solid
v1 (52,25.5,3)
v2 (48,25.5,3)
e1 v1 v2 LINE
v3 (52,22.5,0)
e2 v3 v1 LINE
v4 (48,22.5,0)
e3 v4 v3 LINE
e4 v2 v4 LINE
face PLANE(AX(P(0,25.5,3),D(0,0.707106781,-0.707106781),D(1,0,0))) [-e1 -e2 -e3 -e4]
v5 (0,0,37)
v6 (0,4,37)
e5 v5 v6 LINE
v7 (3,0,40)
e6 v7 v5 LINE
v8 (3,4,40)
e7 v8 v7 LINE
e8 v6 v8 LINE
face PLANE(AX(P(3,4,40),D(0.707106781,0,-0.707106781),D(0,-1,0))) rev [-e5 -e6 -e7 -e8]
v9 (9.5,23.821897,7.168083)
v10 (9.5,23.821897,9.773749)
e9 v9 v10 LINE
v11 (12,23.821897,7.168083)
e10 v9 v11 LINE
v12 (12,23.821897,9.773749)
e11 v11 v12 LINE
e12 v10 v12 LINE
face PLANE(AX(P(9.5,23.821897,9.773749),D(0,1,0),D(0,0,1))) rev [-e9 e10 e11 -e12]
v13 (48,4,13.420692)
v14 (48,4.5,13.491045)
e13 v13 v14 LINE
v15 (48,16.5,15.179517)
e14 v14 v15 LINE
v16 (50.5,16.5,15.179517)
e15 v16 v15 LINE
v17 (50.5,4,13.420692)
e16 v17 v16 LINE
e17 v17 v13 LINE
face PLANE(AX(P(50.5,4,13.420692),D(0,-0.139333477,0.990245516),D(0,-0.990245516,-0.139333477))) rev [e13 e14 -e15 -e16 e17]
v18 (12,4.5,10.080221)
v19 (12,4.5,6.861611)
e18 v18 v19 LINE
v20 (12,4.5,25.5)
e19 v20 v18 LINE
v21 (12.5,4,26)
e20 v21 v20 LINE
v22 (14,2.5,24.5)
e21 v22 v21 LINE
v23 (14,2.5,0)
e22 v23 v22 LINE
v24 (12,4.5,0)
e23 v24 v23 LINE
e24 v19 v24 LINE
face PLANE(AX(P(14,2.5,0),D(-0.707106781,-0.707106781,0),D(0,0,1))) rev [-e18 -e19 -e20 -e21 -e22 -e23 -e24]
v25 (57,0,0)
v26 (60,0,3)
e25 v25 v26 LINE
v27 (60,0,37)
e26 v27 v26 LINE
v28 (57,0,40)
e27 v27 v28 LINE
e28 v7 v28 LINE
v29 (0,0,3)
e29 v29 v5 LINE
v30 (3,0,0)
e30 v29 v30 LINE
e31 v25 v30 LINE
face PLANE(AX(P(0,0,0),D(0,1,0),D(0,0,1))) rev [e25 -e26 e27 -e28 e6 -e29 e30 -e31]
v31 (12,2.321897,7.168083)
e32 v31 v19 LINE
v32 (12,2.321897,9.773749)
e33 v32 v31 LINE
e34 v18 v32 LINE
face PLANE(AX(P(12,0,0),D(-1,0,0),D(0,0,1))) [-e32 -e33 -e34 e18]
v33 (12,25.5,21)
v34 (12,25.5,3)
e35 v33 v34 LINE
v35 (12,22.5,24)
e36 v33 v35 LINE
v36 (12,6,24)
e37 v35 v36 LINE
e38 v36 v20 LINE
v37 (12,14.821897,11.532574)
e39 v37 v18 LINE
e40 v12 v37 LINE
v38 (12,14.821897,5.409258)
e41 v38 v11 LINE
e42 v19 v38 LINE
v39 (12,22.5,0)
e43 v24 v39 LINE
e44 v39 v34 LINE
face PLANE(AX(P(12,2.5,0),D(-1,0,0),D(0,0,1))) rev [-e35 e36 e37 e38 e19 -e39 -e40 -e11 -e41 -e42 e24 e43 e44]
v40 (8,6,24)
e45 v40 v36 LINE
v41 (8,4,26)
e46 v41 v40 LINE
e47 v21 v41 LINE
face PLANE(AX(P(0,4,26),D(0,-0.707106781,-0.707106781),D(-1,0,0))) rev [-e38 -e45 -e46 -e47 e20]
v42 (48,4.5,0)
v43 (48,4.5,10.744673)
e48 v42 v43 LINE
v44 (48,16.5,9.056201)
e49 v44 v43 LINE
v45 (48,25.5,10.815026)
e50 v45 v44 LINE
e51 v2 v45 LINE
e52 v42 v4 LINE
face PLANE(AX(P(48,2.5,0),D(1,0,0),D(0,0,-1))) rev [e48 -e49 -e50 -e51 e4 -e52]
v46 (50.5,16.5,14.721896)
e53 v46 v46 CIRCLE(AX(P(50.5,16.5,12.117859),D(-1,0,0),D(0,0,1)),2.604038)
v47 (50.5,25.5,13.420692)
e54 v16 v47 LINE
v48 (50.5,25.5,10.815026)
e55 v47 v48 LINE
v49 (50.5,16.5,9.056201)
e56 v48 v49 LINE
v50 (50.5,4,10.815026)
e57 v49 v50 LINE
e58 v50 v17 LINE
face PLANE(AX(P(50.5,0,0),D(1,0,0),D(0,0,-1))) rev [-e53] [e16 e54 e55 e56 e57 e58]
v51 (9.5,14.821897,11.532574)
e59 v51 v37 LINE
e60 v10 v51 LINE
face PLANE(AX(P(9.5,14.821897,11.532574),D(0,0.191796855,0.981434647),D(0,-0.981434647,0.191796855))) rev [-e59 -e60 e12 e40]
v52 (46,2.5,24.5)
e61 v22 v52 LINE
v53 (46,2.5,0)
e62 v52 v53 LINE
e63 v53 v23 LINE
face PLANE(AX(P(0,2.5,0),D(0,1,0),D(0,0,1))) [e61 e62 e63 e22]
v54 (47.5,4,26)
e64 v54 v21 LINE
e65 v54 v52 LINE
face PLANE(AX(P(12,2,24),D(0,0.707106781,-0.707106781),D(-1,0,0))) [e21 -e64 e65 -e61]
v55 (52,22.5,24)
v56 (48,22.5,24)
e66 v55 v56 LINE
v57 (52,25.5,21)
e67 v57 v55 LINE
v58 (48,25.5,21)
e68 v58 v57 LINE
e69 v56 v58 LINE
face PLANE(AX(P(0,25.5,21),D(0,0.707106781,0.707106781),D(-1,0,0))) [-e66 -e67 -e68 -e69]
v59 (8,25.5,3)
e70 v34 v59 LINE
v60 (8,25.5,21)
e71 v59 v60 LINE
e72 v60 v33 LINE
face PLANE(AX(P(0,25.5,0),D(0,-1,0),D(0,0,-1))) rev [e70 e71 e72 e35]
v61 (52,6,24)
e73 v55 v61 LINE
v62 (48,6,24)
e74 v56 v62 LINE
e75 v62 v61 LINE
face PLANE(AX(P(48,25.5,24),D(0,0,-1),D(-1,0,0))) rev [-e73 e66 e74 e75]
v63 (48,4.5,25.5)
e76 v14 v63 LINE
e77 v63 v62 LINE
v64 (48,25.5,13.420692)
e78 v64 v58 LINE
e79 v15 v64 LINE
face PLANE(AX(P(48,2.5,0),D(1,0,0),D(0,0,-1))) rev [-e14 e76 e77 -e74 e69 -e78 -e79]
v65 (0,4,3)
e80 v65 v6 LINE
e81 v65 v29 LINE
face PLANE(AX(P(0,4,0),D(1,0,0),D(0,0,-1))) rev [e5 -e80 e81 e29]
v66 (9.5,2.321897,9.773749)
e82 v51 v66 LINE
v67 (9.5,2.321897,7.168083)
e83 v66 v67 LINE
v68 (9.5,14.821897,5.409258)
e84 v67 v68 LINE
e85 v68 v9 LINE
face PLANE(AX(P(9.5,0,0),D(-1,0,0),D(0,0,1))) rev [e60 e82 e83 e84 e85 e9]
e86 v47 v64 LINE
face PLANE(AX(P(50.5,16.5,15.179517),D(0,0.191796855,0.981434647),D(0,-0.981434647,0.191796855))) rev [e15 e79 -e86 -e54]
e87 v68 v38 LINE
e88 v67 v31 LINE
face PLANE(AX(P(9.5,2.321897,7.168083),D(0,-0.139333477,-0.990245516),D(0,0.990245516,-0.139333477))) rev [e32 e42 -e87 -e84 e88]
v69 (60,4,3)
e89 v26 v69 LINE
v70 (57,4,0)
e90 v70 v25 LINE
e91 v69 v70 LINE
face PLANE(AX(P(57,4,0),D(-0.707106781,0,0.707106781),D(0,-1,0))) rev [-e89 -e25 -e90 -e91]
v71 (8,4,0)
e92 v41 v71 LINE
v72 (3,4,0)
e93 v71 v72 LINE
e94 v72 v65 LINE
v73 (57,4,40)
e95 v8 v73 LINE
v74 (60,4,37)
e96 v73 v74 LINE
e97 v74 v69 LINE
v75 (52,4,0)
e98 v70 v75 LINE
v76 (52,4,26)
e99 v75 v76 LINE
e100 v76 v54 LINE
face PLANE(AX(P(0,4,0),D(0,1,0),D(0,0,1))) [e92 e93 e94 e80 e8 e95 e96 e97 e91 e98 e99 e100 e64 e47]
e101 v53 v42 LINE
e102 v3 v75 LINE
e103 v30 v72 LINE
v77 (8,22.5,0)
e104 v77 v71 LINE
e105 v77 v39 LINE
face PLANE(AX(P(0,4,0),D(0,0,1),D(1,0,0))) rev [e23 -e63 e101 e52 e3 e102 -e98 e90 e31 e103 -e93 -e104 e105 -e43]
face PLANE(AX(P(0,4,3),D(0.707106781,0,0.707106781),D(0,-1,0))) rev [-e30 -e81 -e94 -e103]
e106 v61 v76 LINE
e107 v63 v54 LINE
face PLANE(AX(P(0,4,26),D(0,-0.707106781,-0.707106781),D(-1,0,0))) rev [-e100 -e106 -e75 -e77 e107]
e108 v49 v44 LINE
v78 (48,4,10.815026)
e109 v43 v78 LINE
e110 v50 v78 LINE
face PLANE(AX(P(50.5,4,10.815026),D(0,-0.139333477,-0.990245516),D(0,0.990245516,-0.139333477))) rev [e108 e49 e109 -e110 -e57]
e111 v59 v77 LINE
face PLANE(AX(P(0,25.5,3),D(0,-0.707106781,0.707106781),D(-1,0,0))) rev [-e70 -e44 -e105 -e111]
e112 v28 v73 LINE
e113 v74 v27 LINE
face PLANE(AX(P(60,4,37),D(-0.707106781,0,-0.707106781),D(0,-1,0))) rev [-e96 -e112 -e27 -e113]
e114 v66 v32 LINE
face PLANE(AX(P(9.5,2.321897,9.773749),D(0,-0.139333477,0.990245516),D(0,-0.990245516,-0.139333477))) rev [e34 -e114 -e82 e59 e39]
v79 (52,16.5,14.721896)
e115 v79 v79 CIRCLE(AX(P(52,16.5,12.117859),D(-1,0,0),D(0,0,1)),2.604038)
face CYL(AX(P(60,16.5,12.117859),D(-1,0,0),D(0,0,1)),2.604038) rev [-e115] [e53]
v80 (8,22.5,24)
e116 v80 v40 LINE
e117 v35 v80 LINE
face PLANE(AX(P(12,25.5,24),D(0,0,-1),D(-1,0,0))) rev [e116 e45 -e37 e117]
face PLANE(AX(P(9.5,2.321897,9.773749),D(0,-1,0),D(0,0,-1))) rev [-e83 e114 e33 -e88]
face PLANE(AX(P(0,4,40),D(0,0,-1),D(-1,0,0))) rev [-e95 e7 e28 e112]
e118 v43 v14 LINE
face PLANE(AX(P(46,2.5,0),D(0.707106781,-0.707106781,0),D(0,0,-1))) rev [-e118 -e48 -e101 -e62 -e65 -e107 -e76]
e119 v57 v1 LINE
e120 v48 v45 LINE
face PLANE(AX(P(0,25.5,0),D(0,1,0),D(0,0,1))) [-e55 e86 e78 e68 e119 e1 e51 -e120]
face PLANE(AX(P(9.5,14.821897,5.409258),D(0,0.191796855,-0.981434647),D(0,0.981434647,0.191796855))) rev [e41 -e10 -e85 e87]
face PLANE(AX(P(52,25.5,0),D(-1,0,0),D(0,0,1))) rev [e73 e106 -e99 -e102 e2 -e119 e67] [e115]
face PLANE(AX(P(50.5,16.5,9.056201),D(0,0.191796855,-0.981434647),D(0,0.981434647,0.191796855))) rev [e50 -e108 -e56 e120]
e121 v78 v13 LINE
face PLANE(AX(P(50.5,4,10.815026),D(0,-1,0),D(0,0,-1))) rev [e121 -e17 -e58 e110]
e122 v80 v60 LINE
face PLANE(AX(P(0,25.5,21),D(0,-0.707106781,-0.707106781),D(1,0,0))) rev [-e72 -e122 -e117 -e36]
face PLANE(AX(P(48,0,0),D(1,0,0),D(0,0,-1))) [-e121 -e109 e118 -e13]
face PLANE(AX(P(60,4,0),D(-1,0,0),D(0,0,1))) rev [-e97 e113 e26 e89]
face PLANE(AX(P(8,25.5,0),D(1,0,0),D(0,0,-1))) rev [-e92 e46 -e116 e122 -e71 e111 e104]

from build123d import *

# Parameters (mm, degrees)
SKETCH1_W           = 60
SKETCH1_H           = 40
BOSS_EXTRUDE1_DEPTH = 4
CHAMFER1_SIZE       = 3
SKETCH2_W           = 36
SKETCH2_H           = 24
CUT_EXTRUDE1_DEPTH  = 1.5
SKETCH3_W           = 4
SKETCH3_H           = 24
BOSS_EXTRUDE2_DEPTH = 23
CHAMFER2_SIZE       = 3
CHAMFER3_SIZE       = 2
CHAMFER4_SIZE       = 2
CHAMFER5_SIZE       = 2
CUT_EXTRUDE2_DEPTH  = 2.5
SKETCH7_R           = 2.604037506
CUT_EXTRUDE3_DEPTH  = 70.285640648
CUT_EXTRUDE4_DEPTH  = 2.5


with BuildPart() as part:
    # Sketch1 → Boss-Extrude1 (new body)
    with BuildSketch(Plane(origin=(0, 0, 0), x_dir=(1, 0, 0), z_dir=(0, 1, 0))):
        with Locations((30, -20)):
            Rectangle(SKETCH1_W, SKETCH1_H)
    extrude(amount=BOSS_EXTRUDE1_DEPTH)

    # Chamfer1
    chamfer1_edges = [part.edges().sort_by_distance(p)[0] for p in [
        (0, 2, 0),
        (60, 2, 0),
        (60, 2, 40),
        (0, 2, 40),
    ]]
    chamfer(chamfer1_edges, length=CHAMFER1_SIZE)

    # Sketch2 → Cut-Extrude1 (cut)
    with BuildSketch(Plane(origin=(0, 4, 0), x_dir=(1, 0, 0), z_dir=(0, 1, 0))):
        with Locations((30, -12)):
            Rectangle(SKETCH2_W, SKETCH2_H)
    extrude(amount=-CUT_EXTRUDE1_DEPTH, mode=Mode.SUBTRACT)

    # Sketch3 → Boss-Extrude2 (add)
    with BuildSketch(Plane(origin=(0, 2.5, 0), x_dir=(1, 0, 0), z_dir=(0, 1, 0))):
        with Locations((50, -12)):
            Rectangle(SKETCH3_W, SKETCH3_H)
        with Locations((10, -12)):
            Rectangle(SKETCH3_W, SKETCH3_H)
    extrude(amount=BOSS_EXTRUDE2_DEPTH)

    # Chamfer2
    chamfer2_edges = [part.edges().sort_by_distance(p)[0] for p in [
        (50, 25.5, 24),
        (50, 25.5, 0),
        (10, 25.5, 0),
        (10, 25.5, 24),
    ]]
    chamfer(chamfer2_edges, length=CHAMFER2_SIZE)

    # Chamfer3
    chamfer3_edges = [part.edges().sort_by_distance(p)[0] for p in [
        (50, 4, 24),
        (10, 4, 24),
    ]]
    chamfer(chamfer3_edges, length=CHAMFER3_SIZE)

    # Chamfer4
    # the kernel refuses this chamfer: 2 mm, written as the material it takes off along each edge
    with BuildSketch(Plane(origin=(48, 4, 24), x_dir=(0, -0.9996219169112968, -0.027495876610585623), z_dir=(-1, 0, 0))) as chamfer4_piece_1_section:
        Polygon((CHAMFER4_SIZE * 0.999621916911, CHAMFER4_SIZE * 0.0274958766106), (-CHAMFER4_SIZE * 0.0274958766106, CHAMFER4_SIZE * 0.999621916911), (0, 0), align=None)
    chamfer4_piece_1 = extrude(amount=36, mode=Mode.PRIVATE)
    chamfer4_piece_1 = split(chamfer4_piece_1, bisect_by=Plane(origin=(30, 2.5, 24.699033576), z_dir=(0, 1, 0)), keep=Keep.TOP, mode=Mode.PRIVATE)
    chamfer4_piece_1 = split(chamfer4_piece_1, bisect_by=Plane(origin=(30, 4.361799404, 25.638200596), z_dir=(0, -0.7071067811865476, -0.7071067811865476)), keep=Keep.TOP, mode=Mode.PRIVATE)
    add(chamfer4_piece_1, mode=Mode.SUBTRACT)

    # Chamfer5
    # the kernel refuses this chamfer: 2 mm, written as the material it adds along each edge
    with BuildSketch(Plane(origin=(12, 2.5, 29.643365976), x_dir=(-0.027495876610586487, 0.9996219169112968, 0), z_dir=(0, 0, -1))) as chamfer5_piece_1_section:
        Polygon((CHAMFER5_SIZE * 0.999621916911, CHAMFER5_SIZE * 0.0274958766106), (-CHAMFER5_SIZE * 0.0274958766106, CHAMFER5_SIZE * 0.999621916911), (0, 0), align=None)
    chamfer5_piece_1 = extrude(amount=29.643365976, mode=Mode.PRIVATE)
    chamfer5_piece_1 = split(chamfer5_piece_1, bisect_by=Plane(origin=(12.696713147, 10.276643426, 19.723356574), z_dir=(0, -0.7071067811865476, -0.7071067811865476)), keep=Keep.TOP, mode=Mode.PRIVATE)
    add(chamfer5_piece_1)
    with BuildSketch(Plane(origin=(48, 2.5, 29.643365976), x_dir=(-0.9996219169112968, -0.027495876610586296, 0), z_dir=(0, 0, -1))) as chamfer5_piece_2_section:
        Polygon((CHAMFER5_SIZE * 0.999621916911, CHAMFER5_SIZE * 0.0274958766106), (-CHAMFER5_SIZE * 0.0274958766106, CHAMFER5_SIZE * 0.999621916911), (0, 0), align=None)
    chamfer5_piece_2 = extrude(amount=29.643365976, mode=Mode.PRIVATE)
    chamfer5_piece_2 = split(chamfer5_piece_2, bisect_by=Plane(origin=(47.833064516, 10.624596774, 19.375403226), z_dir=(0, -0.7071067811865476, -0.7071067811865476)), keep=Keep.TOP, mode=Mode.PRIVATE)
    add(chamfer5_piece_2)

    # Sketch4 → Cut-Extrude2 (cut)
    with BuildSketch(Plane.ZY.offset(-48)):
        Polygon((9.05620064, 16.5), (10.815025537, 25.5), (13.420692052, 25.5), (15.179516949, 16.5), (13.420692052, 4), (10.815025537, 4), align=None)
    extrude(amount=-CUT_EXTRUDE2_DEPTH, mode=Mode.SUBTRACT)

    # Sketch7 → Cut-Extrude3 (cut, through all)
    with BuildSketch(Plane.ZY.offset(-50.5)):
        with Locations((12.117858795, 16.5)):
            Circle(SKETCH7_R)
    extrude(amount=-CUT_EXTRUDE3_DEPTH, mode=Mode.SUBTRACT)

    # Sketch8 → Cut-Extrude4 (cut)
    with BuildSketch(Plane(origin=(12, 0, 0), x_dir=(0, 0, -1), z_dir=(1, 0, 0))):
        Polygon((-11.53257408, 14.821897089), (-9.773749183, 23.821897089), (-7.168082669, 23.821897089), (-5.409257772, 14.821897089), (-7.168082669, 2.321897089), (-9.773749183, 2.321897089), align=None)
    extrude(amount=-CUT_EXTRUDE4_DEPTH, mode=Mode.SUBTRACT)


solid = part.part
